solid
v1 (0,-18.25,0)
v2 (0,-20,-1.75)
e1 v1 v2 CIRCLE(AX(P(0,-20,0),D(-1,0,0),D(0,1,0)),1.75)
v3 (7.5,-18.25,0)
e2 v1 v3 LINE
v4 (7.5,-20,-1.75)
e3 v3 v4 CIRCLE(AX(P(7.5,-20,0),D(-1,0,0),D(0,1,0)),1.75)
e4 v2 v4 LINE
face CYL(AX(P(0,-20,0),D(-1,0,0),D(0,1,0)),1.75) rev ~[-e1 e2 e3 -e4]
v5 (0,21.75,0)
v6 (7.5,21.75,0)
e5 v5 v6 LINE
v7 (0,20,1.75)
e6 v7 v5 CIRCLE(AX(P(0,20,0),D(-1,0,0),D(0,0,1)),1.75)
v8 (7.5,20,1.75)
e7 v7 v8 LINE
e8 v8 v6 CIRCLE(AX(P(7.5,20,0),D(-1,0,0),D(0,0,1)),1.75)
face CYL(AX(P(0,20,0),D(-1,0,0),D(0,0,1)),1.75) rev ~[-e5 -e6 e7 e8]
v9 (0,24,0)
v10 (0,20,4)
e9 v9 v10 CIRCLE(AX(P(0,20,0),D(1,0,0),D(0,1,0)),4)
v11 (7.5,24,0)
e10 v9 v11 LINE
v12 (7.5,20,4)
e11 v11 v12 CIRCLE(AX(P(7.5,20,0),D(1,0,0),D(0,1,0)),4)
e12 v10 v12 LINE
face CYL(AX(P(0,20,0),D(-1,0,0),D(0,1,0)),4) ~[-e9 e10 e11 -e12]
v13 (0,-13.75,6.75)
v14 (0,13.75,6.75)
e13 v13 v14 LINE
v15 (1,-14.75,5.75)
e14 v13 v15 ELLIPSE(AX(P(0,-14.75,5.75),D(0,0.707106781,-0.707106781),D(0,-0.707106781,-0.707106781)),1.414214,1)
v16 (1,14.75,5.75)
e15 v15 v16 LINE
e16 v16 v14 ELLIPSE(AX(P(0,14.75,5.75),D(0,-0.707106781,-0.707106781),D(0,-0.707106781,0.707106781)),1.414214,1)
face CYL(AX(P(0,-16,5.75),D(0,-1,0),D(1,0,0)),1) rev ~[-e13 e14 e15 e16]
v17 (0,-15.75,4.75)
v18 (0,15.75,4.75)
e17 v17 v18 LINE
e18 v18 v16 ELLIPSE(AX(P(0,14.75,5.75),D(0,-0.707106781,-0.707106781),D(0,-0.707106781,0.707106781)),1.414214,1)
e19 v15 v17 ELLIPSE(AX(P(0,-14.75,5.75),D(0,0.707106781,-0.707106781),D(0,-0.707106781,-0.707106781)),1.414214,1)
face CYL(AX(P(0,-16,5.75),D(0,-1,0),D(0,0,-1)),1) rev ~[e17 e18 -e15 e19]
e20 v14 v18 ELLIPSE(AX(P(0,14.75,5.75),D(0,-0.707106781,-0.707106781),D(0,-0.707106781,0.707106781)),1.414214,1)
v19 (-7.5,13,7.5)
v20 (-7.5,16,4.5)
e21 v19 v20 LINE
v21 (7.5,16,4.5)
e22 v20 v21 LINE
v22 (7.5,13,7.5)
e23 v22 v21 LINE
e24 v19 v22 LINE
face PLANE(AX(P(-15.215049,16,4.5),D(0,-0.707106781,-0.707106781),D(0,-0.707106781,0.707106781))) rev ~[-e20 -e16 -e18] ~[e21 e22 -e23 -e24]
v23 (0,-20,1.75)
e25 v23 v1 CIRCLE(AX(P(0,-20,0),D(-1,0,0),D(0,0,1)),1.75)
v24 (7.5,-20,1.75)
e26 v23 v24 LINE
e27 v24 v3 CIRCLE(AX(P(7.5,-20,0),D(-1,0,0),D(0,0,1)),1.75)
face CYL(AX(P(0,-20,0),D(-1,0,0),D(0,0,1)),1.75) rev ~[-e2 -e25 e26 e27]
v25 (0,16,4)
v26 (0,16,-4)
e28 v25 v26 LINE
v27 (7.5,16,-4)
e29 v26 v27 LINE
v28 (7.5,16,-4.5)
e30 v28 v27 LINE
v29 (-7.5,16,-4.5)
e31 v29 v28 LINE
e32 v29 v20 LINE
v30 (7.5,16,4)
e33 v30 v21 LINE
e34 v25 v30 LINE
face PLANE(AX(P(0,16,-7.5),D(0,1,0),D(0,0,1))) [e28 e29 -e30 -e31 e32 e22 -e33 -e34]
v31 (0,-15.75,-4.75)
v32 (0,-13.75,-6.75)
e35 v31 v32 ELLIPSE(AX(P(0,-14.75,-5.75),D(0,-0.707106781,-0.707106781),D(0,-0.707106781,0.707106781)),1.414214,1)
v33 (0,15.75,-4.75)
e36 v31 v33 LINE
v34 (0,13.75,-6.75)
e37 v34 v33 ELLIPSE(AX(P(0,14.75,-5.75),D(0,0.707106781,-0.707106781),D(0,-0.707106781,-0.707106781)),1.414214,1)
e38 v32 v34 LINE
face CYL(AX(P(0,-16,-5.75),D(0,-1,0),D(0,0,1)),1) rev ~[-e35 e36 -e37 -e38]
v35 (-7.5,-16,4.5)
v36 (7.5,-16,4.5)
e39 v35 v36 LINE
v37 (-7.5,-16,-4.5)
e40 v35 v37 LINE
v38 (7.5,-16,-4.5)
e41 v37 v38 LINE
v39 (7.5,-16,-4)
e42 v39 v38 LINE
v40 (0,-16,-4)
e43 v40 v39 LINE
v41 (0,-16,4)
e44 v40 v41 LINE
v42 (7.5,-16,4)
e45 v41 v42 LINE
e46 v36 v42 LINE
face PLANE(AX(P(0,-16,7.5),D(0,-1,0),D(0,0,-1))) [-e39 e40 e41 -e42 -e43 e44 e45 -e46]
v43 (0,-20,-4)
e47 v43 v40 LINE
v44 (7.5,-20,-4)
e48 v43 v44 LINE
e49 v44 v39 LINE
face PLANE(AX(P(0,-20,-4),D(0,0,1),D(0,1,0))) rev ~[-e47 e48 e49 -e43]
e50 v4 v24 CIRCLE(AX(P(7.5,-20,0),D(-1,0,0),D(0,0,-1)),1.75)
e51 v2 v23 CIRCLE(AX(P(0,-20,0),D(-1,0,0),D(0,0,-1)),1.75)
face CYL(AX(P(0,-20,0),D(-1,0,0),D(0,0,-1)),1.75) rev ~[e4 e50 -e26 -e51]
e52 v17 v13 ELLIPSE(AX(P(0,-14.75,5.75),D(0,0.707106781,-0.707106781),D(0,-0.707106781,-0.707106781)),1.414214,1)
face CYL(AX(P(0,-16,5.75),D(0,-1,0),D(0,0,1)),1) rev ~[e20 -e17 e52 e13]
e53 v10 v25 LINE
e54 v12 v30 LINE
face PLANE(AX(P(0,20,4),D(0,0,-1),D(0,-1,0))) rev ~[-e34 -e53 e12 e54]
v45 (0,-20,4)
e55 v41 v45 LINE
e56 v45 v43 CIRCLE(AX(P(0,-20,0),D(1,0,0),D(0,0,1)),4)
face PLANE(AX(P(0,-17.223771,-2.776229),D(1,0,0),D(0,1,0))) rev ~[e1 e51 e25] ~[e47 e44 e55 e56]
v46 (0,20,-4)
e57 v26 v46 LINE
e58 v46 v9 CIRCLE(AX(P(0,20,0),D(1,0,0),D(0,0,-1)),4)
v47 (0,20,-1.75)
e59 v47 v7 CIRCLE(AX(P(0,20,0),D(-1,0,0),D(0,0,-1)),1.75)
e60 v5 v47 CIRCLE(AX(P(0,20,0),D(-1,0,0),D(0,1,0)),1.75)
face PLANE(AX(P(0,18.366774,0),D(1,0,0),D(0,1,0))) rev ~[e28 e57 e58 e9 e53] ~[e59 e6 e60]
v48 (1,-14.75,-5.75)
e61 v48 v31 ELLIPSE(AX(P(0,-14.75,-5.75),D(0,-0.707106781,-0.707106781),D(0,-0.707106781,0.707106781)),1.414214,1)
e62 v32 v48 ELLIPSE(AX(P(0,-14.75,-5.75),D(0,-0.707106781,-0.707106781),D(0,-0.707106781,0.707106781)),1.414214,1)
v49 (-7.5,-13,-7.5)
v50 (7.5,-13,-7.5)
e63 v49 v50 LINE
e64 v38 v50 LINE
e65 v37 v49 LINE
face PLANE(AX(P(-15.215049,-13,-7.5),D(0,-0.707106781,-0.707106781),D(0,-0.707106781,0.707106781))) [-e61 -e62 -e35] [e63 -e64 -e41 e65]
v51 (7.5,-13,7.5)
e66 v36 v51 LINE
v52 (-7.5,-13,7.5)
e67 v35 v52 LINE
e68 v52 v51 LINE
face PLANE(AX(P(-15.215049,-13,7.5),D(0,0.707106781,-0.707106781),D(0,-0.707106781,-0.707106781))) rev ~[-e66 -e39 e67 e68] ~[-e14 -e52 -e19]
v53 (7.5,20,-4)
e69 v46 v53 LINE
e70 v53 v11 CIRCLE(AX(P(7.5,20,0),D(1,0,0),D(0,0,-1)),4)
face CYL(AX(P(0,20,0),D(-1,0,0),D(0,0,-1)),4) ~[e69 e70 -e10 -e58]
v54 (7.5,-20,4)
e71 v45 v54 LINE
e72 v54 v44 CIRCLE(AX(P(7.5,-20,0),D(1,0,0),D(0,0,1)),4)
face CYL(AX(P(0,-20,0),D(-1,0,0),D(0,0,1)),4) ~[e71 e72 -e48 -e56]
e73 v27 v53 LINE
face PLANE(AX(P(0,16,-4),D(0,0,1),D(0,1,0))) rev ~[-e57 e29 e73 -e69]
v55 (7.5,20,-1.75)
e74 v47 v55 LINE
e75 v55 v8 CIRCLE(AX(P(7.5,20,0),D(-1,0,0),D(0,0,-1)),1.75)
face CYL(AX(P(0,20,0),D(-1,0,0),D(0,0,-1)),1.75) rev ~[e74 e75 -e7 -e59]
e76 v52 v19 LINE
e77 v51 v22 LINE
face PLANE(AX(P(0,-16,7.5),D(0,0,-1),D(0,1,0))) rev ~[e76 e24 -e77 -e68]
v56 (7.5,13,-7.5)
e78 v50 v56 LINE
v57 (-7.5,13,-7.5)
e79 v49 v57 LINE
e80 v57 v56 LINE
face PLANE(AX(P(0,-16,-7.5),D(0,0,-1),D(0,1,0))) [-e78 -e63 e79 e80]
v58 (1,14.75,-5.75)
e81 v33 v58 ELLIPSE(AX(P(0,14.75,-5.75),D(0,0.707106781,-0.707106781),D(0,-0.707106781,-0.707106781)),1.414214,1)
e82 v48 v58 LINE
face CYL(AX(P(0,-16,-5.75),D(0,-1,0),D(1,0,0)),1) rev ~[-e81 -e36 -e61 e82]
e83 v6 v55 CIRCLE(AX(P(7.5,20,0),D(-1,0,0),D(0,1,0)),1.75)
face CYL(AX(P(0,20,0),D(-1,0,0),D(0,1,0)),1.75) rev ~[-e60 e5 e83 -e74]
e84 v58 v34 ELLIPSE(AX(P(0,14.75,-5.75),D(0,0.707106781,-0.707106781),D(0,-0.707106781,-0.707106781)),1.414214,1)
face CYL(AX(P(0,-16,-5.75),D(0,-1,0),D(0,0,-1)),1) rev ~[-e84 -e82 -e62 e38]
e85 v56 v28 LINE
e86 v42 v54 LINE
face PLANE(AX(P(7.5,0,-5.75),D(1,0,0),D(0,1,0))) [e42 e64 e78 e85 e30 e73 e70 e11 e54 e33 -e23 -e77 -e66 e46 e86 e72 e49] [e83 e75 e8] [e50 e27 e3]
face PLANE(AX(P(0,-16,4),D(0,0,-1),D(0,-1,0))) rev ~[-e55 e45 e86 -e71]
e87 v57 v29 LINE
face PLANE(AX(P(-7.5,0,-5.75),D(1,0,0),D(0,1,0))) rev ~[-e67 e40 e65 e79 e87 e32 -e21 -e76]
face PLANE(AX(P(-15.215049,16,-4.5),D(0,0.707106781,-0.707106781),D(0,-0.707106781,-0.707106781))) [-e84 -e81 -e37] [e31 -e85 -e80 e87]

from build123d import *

# Parameters (mm, degrees)
F0_W        = 32
F0_H        = 3.5
F1_DEPTH    = 7.5
F2_DEPTH    = 7.5
F4_DEPTH    = 40
F5_T1_DEPTH = 30.4300979278


# Not quite as in the source:
# - a fillet or chamfer that OpenCascade refuses, or shapes differently, is made with other operations: its cross-section is extruded or revolved along the edge and cut away or added


with BuildPart() as f1:
    # F0 (on Right) → F1 (new body, symmetric)
    with BuildSketch(Plane.YZ):
        with Locations((0, -5.75)):
            Rectangle(F0_W, F0_H)
        Polygon((16, 0), (16, 4), (-16, 4), (-16, 0), (-16, -4), (16, -4), align=None)
        with Locations((0, 5.75)):
            Rectangle(F0_W, F0_H)
    extrude(amount=F1_DEPTH, both=True)

    # F0 (on Right) → F2 (join)
    with BuildSketch(Plane.YZ):
        with BuildLine():
            Line((-16, -4), (-16, 0))
            ThreePointArc((-16, 0), (-17.1715728753, -2.8284271247), (-20, -4))
            Line((-20, -4), (-16, -4))
        make_face()
        with BuildLine():
            ThreePointArc((-16, 0), (-17.1715728753, 2.8284271247), (-20, 4))
            Line((-20, 4), (-20, 1.75))
            ThreePointArc((-20, 1.75), (-18.7625631329, 1.2374368671), (-18.25, 0))
            ThreePointArc((-18.25, 0), (-18.7625631329, -1.2374368671), (-20, -1.75))
            Line((-20, -1.75), (-20, -4))
            ThreePointArc((-20, -4), (-17.1715728753, -2.8284271247), (-16, 0))
        make_face()
        with BuildLine():
            Line((-16, 0), (-16, 4))
            Line((-16, 4), (-20, 4))
            ThreePointArc((-20, 4), (-17.1715728753, 2.8284271247), (-16, 0))
        make_face()
        with BuildLine():
            Line((-20, 1.75), (-20, 4))
            ThreePointArc((-20, 4), (-24, 0), (-20, -4))
            Line((-20, -4), (-20, -1.75))
            ThreePointArc((-20, -1.75), (-21.75, 0), (-20, 1.75))
        make_face()
        with BuildLine():
            Line((20, 1.75), (20, 4))
            ThreePointArc((20, 4), (17.1715728753, 2.8284271247), (16, 0))
            ThreePointArc((16, 0), (17.1715728753, -2.8284271247), (20, -4))
            Line((20, -4), (20, -1.75))
            ThreePointArc((20, -1.75), (18.25, 0), (20, 1.75))
        make_face()
        with BuildLine():
            ThreePointArc((16, 0), (17.1715728753, 2.8284271247), (20, 4))
            Line((20, 4), (16, 4))
            Line((16, 4), (16, 0))
        make_face()
        with BuildLine():
            ThreePointArc((20, -4), (17.1715728753, -2.8284271247), (16, 0))
            Line((16, 0), (16, -4))
            Line((16, -4), (20, -4))
        make_face()
        with BuildLine():
            ThreePointArc((24, 0), (22.8284271247, 2.8284271247), (20, 4))
            Line((20, 4), (20, 1.75))
            ThreePointArc((20, 1.75), (21.2374368671, 1.2374368671), (21.75, 0))
            ThreePointArc((21.75, 0), (21.2374368671, -1.2374368671), (20, -1.75))
            Line((20, -1.75), (20, -4))
            ThreePointArc((20, -4), (22.8284271247, -2.8284271247), (24, 0))
        make_face()
    extrude(amount=F2_DEPTH)

    # F3 (on face) → F4 (cut)
    with BuildSketch(Plane.XZ.offset(16)):
        with BuildLine():
            ThreePointArc((1, 5.75), (0.7071067812, 6.4571067812), (0, 6.75))
            Line((0, 6.75), (0, 4.75))
            ThreePointArc((0, 4.75), (0.7071067812, 5.0428932188), (1, 5.75))
        make_face()
        with BuildLine():
            Line((0, 4.75), (0, 6.75))
            ThreePointArc((0, 6.75), (-1, 5.75), (0, 4.75))
        make_face()
        with BuildLine():
            ThreePointArc((1, -5.75), (0.7071067812, -5.0428932188), (0, -4.75))
            Line((0, -4.75), (0, -6.75))
            ThreePointArc((0, -6.75), (0.7071067812, -6.4571067812), (1, -5.75))
        make_face()
        with BuildLine():
            Line((0, -6.75), (0, -4.75))
            ThreePointArc((0, -4.75), (-1, -5.75), (0, -6.75))
        make_face()
    extrude(amount=-F4_DEPTH, mode=Mode.SUBTRACT)

    # F5: chamfer of 3 on 4 edges, made by hand

    # F5_s2 → F5_t1 (cut)
    with BuildSketch(Plane.YZ.offset(-15.2150489639)):
        Polygon((-13, 7.5), (-16, 4.5), (-16, 7.5), align=None)
        Polygon((-13, -7.5), (-16, -4.5), (-16, -7.5), align=None)
        Polygon((16, 4.5), (13, 7.5), (16, 7.5), align=None)
        Polygon((16, -4.5), (13, -7.5), (16, -7.5), align=None)
    extrude(amount=F5_T1_DEPTH, mode=Mode.SUBTRACT)


solid = f1.part
